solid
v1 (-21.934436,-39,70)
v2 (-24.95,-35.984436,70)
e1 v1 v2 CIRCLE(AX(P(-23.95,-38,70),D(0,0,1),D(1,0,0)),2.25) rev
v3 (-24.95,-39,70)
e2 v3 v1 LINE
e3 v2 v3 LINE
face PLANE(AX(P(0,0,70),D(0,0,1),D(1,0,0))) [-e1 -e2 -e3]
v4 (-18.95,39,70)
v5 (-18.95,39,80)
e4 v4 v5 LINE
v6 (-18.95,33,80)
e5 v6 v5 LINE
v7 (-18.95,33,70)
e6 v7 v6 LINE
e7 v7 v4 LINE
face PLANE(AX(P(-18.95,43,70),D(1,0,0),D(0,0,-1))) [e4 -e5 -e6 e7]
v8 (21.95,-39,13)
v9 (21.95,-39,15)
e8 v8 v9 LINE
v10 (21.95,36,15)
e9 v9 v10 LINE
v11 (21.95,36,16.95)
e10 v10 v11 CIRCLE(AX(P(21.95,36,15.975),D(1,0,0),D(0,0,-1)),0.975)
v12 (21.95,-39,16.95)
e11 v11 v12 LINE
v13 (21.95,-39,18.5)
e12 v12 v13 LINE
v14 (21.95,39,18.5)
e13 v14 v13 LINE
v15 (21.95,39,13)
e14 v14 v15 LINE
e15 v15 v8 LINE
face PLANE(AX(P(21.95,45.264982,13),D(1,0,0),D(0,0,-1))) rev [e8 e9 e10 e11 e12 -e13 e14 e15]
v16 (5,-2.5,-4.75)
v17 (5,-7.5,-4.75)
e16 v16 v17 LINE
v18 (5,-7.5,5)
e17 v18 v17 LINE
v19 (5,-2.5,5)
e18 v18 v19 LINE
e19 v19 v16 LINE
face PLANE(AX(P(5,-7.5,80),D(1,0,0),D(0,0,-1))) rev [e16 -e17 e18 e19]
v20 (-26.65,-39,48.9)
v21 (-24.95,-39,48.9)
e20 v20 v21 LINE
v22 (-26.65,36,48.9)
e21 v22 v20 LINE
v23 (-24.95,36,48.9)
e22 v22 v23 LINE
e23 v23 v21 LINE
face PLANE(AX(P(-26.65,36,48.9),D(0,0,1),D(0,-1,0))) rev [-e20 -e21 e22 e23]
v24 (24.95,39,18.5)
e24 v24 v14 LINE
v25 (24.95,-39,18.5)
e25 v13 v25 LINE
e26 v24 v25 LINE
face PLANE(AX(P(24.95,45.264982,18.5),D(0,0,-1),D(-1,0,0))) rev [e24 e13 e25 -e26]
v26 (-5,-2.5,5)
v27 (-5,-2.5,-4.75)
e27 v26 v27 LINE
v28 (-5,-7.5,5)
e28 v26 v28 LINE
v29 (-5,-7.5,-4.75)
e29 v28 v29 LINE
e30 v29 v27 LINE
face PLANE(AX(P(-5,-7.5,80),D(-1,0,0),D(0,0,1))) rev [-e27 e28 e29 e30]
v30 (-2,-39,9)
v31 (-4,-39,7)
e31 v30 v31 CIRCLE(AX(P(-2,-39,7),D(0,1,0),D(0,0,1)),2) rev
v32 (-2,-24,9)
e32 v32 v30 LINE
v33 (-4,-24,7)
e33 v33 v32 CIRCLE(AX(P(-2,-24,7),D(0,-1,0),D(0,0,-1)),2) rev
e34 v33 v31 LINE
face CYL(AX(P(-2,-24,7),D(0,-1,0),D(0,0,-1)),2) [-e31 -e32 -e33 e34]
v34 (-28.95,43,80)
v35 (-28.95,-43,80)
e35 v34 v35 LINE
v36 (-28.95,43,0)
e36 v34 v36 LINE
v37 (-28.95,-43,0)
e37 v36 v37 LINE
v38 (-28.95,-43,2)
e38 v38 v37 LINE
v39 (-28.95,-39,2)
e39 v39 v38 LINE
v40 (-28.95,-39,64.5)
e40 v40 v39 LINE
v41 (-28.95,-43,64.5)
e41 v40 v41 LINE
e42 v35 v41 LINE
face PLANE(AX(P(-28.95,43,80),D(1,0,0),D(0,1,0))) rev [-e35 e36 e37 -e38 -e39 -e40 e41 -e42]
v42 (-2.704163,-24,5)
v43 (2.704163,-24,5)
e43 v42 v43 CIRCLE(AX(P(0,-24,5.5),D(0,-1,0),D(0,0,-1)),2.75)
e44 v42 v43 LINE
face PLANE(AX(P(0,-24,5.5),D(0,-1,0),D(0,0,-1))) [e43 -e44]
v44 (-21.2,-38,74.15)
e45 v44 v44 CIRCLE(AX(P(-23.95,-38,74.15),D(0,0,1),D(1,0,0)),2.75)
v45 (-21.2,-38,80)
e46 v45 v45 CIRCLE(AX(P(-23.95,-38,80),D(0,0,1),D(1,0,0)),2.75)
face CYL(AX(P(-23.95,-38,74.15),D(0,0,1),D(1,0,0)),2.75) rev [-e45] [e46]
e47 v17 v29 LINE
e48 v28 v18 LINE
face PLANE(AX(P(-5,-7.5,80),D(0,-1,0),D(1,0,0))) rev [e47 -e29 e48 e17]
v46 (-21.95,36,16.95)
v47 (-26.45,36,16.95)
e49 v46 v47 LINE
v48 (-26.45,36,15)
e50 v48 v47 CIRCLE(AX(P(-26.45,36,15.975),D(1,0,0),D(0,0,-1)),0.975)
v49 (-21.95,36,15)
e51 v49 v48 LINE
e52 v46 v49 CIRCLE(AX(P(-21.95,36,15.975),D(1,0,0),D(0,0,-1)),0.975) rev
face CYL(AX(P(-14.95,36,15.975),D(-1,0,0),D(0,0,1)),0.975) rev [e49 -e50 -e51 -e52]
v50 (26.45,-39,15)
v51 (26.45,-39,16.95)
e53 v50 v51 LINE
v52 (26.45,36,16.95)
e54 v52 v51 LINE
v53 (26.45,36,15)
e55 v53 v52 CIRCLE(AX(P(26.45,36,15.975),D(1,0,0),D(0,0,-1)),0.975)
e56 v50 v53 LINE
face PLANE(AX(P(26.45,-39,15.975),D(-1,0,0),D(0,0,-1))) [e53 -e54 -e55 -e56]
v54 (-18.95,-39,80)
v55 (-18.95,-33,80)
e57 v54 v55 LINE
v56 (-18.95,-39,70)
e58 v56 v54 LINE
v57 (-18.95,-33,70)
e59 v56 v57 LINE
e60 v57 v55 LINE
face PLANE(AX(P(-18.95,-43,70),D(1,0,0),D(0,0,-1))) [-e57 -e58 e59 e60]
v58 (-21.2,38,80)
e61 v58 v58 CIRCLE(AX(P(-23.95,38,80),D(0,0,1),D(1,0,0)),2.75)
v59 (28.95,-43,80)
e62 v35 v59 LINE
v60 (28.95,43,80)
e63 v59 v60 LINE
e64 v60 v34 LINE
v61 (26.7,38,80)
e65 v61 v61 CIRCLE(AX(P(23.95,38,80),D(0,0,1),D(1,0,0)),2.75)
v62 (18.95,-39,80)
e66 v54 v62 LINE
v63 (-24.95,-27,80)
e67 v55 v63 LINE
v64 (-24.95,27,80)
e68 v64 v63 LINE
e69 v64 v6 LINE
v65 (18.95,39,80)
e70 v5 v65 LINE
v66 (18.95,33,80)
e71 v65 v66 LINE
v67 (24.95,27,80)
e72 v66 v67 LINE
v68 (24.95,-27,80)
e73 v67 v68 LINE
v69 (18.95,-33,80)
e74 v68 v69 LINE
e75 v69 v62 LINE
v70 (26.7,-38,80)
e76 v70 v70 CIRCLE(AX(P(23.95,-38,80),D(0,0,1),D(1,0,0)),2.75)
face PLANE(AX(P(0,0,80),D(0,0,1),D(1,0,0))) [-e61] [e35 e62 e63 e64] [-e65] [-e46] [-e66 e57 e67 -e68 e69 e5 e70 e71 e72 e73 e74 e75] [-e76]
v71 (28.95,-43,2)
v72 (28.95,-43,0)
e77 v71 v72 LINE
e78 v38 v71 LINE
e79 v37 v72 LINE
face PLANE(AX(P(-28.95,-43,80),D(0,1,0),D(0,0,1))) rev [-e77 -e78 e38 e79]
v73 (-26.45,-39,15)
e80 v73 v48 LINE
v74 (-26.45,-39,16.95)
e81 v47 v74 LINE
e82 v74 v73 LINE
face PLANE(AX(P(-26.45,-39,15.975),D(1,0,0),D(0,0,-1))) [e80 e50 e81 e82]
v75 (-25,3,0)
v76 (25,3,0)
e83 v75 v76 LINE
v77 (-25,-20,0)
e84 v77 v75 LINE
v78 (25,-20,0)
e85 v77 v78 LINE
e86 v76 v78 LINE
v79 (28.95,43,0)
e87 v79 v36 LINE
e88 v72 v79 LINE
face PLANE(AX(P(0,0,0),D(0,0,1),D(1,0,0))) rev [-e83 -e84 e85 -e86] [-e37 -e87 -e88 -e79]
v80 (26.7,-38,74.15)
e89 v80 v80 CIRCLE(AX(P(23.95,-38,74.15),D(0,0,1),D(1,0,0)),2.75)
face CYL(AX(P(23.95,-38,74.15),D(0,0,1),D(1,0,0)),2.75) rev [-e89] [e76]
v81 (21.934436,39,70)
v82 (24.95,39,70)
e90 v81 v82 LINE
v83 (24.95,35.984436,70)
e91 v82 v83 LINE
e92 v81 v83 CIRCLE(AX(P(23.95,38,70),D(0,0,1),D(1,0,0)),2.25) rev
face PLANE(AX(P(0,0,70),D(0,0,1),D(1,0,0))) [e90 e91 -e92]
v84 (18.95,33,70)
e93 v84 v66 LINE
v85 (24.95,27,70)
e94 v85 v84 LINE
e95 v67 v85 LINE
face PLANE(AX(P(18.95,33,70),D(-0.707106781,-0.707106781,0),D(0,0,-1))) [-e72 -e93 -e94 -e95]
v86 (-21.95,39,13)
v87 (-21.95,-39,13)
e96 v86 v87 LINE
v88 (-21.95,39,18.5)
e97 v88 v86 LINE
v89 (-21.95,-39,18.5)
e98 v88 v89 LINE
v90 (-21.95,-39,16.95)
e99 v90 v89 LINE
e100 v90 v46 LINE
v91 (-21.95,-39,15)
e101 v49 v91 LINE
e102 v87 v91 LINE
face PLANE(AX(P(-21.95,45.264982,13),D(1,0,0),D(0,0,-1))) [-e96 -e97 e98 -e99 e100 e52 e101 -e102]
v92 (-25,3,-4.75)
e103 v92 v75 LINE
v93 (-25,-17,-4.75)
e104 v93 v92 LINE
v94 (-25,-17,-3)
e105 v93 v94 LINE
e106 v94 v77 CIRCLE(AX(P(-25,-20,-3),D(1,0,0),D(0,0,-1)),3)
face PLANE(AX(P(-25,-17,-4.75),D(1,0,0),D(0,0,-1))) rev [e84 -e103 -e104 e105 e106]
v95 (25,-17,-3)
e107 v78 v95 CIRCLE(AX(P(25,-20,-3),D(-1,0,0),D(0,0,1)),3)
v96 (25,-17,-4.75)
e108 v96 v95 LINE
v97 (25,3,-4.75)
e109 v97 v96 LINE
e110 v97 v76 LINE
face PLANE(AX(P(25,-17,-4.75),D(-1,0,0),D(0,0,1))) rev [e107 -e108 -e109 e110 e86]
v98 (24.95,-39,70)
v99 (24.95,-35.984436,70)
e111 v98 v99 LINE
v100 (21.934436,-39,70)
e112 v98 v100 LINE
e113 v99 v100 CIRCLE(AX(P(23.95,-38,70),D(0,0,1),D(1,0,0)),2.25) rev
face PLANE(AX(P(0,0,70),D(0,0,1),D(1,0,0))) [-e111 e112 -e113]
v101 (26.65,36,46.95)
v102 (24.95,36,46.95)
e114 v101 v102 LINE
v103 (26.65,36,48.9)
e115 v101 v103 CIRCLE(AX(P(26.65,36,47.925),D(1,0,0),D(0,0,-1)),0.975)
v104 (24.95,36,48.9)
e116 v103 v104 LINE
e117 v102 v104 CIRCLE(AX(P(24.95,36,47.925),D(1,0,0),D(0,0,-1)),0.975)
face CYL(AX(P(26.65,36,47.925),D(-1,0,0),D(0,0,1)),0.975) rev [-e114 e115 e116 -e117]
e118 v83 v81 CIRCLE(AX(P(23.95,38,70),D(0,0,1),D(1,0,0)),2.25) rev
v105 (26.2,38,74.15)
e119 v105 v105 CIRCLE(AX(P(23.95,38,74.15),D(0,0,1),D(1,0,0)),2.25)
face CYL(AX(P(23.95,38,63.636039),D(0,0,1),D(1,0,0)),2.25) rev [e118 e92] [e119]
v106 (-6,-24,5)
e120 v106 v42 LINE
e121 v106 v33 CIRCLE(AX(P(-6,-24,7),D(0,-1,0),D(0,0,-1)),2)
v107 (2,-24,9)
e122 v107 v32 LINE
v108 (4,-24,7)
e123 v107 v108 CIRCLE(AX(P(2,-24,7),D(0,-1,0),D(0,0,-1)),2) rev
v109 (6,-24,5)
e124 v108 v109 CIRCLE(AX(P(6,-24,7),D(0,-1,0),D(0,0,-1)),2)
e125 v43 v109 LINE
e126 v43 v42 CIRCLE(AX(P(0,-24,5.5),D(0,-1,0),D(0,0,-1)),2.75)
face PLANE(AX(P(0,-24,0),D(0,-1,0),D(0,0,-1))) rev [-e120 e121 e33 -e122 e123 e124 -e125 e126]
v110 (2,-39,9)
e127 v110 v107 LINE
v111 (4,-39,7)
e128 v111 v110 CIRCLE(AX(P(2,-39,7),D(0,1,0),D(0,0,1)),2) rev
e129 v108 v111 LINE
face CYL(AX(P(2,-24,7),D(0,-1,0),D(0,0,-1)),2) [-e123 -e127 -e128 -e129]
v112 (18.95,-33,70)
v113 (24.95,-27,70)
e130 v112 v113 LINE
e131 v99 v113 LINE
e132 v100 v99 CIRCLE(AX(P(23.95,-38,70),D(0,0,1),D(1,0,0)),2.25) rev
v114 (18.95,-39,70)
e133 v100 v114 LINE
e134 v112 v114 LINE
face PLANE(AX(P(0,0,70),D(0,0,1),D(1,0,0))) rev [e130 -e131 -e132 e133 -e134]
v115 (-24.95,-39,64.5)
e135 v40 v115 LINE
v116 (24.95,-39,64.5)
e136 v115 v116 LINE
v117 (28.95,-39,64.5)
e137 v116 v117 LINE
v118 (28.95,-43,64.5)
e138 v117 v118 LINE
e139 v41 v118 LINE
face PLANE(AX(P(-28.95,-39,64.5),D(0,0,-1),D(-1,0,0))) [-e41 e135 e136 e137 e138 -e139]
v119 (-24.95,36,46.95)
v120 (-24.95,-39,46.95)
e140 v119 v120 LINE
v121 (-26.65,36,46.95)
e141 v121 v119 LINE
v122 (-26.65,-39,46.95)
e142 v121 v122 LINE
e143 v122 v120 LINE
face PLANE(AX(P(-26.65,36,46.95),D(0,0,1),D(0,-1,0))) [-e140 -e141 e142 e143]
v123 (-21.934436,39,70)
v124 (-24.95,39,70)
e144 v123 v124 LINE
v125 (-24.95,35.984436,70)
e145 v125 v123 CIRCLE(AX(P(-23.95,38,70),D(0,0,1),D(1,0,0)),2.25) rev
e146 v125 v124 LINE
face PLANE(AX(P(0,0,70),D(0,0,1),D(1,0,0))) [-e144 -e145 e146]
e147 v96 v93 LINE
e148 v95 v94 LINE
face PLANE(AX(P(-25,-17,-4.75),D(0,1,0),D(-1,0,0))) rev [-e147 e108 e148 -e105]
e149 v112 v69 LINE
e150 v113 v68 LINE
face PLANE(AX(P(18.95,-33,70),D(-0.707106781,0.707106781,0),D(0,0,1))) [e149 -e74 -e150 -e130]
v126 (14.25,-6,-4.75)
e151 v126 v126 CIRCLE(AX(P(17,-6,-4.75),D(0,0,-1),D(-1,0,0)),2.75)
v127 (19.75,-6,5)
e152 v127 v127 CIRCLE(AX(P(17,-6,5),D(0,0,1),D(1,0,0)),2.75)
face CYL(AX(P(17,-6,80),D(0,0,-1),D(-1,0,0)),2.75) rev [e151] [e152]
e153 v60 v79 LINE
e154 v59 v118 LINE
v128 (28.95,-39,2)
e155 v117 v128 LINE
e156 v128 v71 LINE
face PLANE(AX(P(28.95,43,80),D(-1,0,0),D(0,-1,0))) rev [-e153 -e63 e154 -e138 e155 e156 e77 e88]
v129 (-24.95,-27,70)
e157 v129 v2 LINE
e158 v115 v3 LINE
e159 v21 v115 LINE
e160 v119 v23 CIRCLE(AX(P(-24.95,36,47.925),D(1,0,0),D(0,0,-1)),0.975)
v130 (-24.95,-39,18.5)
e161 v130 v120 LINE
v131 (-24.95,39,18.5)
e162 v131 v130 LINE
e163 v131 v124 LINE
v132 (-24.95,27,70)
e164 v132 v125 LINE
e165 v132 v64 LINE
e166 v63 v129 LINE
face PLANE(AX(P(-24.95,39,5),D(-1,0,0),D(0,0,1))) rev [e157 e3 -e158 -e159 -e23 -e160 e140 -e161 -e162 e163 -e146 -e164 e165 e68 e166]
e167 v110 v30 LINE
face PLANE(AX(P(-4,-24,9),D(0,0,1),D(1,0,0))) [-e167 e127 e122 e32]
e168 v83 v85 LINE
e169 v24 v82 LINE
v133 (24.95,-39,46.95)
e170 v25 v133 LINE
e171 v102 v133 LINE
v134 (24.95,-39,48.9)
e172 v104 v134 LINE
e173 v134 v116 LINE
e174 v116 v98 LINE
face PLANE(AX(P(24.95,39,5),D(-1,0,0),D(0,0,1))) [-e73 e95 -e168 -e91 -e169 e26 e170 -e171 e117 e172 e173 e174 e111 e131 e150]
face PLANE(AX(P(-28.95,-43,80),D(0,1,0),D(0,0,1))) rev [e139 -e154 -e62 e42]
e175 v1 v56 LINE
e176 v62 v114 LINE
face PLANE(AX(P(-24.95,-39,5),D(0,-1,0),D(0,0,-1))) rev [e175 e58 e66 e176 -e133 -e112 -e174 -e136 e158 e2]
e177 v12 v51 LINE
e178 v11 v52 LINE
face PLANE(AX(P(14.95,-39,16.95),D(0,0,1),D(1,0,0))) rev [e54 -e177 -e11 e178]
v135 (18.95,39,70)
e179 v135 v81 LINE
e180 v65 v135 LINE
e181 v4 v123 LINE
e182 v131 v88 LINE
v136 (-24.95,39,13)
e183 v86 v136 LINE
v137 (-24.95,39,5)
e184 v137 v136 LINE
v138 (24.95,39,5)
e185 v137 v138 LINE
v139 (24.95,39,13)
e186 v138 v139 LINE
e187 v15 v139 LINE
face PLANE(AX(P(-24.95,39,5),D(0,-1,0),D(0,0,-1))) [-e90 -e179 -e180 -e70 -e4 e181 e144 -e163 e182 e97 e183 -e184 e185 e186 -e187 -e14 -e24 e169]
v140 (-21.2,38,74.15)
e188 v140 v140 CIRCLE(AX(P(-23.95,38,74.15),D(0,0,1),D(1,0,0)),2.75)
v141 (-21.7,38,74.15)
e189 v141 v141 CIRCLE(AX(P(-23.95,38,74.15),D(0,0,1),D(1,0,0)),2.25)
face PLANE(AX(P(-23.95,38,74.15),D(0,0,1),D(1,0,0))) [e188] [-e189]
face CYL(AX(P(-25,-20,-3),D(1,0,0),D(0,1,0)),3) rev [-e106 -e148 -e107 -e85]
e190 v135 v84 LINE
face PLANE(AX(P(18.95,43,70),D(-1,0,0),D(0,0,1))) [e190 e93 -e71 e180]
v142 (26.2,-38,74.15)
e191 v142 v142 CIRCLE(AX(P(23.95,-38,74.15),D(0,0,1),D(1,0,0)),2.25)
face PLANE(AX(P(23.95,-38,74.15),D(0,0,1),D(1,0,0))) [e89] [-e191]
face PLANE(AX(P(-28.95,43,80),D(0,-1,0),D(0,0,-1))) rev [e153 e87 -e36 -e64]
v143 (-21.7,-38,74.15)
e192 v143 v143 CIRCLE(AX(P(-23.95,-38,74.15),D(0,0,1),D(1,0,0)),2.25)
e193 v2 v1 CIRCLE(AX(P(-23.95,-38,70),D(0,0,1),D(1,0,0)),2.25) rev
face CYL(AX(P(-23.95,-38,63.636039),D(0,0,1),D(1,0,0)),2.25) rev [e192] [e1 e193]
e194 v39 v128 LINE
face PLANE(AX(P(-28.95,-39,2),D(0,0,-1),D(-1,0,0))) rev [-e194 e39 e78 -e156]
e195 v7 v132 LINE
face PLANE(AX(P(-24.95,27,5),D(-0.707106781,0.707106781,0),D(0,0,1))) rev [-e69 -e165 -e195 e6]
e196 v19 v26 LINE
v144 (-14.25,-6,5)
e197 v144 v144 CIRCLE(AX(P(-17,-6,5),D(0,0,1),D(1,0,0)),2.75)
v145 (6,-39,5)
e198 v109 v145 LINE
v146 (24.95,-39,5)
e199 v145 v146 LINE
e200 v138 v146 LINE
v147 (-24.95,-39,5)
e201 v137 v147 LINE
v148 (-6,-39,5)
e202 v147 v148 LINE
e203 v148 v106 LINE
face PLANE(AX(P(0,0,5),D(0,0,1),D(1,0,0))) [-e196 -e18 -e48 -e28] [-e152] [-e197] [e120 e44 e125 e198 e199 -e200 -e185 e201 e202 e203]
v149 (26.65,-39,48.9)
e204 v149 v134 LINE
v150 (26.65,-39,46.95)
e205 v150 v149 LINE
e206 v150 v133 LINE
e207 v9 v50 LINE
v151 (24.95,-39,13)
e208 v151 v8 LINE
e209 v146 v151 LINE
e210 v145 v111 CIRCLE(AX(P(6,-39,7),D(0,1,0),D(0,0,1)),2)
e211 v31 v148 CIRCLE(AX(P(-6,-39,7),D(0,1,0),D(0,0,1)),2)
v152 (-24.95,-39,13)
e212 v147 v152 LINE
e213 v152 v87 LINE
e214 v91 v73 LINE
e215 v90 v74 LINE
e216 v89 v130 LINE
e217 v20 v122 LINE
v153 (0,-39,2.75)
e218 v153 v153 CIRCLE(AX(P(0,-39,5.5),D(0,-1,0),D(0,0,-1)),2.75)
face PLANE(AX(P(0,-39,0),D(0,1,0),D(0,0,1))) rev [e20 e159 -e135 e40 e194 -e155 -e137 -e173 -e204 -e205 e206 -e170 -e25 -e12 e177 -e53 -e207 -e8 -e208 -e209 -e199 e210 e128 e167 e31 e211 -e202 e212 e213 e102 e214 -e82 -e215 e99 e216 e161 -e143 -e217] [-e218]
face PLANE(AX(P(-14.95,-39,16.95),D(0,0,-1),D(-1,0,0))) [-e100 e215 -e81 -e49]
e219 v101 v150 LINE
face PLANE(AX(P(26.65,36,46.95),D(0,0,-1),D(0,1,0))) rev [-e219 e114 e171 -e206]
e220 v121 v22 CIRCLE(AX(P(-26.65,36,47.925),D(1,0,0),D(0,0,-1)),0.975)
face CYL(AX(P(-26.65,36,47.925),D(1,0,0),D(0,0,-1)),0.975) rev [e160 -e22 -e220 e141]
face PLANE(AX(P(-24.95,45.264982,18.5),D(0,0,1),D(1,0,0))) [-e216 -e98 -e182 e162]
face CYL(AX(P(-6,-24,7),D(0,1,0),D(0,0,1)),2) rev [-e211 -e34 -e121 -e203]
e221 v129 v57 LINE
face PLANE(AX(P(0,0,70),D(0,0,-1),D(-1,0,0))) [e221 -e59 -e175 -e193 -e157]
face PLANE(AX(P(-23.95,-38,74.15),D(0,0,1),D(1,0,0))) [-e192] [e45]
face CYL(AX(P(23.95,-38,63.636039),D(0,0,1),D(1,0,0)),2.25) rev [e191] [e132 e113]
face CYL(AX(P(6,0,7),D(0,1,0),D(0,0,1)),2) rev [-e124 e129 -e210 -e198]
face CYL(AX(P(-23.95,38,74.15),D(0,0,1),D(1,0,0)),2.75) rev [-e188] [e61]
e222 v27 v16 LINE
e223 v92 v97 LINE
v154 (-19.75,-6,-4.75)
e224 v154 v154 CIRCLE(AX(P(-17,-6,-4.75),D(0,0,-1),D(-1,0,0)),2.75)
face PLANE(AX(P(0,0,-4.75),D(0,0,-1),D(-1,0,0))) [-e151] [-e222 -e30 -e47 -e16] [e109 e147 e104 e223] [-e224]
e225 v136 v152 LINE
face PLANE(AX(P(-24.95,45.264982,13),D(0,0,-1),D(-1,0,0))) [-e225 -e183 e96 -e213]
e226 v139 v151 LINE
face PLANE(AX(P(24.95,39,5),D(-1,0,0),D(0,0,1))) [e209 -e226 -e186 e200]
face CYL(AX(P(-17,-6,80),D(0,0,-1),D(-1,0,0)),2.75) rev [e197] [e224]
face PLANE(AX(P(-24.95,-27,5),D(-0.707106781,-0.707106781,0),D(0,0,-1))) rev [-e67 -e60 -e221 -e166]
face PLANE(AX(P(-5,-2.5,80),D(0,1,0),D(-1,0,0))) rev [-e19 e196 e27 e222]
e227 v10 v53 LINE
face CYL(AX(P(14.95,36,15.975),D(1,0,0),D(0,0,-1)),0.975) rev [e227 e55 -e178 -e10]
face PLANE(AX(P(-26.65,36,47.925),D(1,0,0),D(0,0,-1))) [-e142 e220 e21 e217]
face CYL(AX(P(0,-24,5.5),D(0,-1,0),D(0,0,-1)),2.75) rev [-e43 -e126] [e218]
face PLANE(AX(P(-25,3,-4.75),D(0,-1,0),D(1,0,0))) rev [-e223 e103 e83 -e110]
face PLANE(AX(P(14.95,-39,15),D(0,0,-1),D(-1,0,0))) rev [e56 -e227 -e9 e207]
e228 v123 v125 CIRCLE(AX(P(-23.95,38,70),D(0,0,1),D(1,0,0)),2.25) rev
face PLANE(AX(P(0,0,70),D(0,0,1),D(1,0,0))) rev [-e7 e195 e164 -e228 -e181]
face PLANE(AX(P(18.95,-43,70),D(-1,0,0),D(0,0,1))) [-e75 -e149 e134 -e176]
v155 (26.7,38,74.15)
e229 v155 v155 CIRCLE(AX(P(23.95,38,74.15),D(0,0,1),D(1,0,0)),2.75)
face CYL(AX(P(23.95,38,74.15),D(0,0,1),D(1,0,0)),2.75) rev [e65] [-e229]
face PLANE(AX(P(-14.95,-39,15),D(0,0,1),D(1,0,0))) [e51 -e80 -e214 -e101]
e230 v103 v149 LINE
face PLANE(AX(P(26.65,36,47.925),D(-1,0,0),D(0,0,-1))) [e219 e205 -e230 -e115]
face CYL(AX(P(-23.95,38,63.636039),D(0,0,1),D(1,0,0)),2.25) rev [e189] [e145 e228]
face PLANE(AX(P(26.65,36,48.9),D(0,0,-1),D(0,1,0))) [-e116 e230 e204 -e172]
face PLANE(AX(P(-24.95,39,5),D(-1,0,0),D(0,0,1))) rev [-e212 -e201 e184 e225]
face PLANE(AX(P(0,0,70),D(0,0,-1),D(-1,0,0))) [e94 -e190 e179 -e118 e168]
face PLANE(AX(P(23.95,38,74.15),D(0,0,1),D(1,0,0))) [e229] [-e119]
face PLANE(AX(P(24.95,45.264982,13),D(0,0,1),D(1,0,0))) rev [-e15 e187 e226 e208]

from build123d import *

# Parameters (mm, degrees)
ESQUISSE1_W              = 57.9
ESQUISSE1_H              = 86
BOSS_EXTRU_1_DEPTH       = 80
ESQUISSE2_W              = 49.9
ESQUISSE2_H              = 78
ENL_V_MAT_EXTRU_1_DEPTH  = 75
ESQUISSE3_W              = 10
ESQUISSE3_H              = 10
BOSS_EXTRU_2_DEPTH       = 10
ESQUISSE4_R              = 2.75
ENL_V_MAT_EXTRU_2_DEPTH  = 5.85
ESQUISSE47_R             = 2.25
ENL_V_MAT_EXTRU_25_DEPTH = 10
ESQUISSE19_W             = 50
ESQUISSE19_H             = 20
BOSS_EXTRU_9_DEPTH       = 4.75
CONG_1_R                 = 3
ESQUISSE29_W             = 10
ESQUISSE29_H             = 5
ENL_V_MAT_EXTRU_11_DEPTH = 100.346187647
ESQUISSE32_W             = 57.9
ESQUISSE32_H             = 62.5
ENL_V_MAT_EXTRU_16_DEPTH = 4
ESQUISSE46_W             = 3
ESQUISSE46_H             = 5.5
BOSS_EXTRU_10_DEPTH      = 78
ENL_V_START              = -1.5
ENL_V_MAT_EXTRU_20_DEPTH = 11.5
ENL_V_MAT_EXTRU_21_DEPTH = 1.7
CHANFREIN1_SIZE          = 6
ESQUISSE45_R             = 2.75
ENL_V_MAT_EXTRU_24_DEPTH = 100.346187647
ESQUISSE48_W             = 8
ESQUISSE48_H             = 4
BOSS_EXTRU_11_DEPTH      = 15
ESQUISSE49_R             = 2.75
ENL_V_MAT_EXTRU_26_DEPTH = 15
CONG_2_R                 = 2


with BuildPart() as part:
    # Esquisse1 → Boss.-Extru.1 (new body)
    with BuildSketch(Plane.XY):
        Rectangle(ESQUISSE1_W, ESQUISSE1_H)
    extrude(amount=BOSS_EXTRU_1_DEPTH)

    # Esquisse2 → Enlèv. mat.-Extru.1 (cut)
    with BuildSketch(Plane.XY.offset(80)):
        Rectangle(ESQUISSE2_W, ESQUISSE2_H)
    extrude(amount=-ENL_V_MAT_EXTRU_1_DEPTH, mode=Mode.SUBTRACT)

    # Esquisse3 → Boss.-Extru.2 (add)
    with BuildSketch(Plane.XY.offset(80)):
        with Locations((-23.95, 38)):
            Rectangle(ESQUISSE3_W, ESQUISSE3_H)
        with Locations((-23.95, -38)):
            Rectangle(ESQUISSE3_W, ESQUISSE3_H)
        with Locations((23.95, -38)):
            Rectangle(ESQUISSE3_W, ESQUISSE3_H)
        with Locations((23.95, 38)):
            Rectangle(ESQUISSE3_W, ESQUISSE3_H)
    extrude(amount=-BOSS_EXTRU_2_DEPTH)

    # Esquisse4 → Enlèv. mat.-Extru.2 (cut)
    with BuildSketch(Plane.XY.offset(80)):
        with Locations((23.95, -38)):
            Circle(ESQUISSE4_R)
        with Locations((-23.95, -38)):
            Circle(ESQUISSE4_R)
        with Locations((-23.95, 38)):
            Circle(ESQUISSE4_R)
        with Locations((23.95, 38)):
            Circle(ESQUISSE4_R)
    extrude(amount=-ENL_V_MAT_EXTRU_2_DEPTH, mode=Mode.SUBTRACT)

    # Esquisse47 → Enlèv. mat.-Extru.25 (cut)
    with BuildSketch(Plane.XY.offset(80)):
        with Locations((23.95, -38)):
            Circle(ESQUISSE47_R)
        with Locations((-23.95, -38)):
            Circle(ESQUISSE47_R)
        with Locations((-23.95, 38)):
            Circle(ESQUISSE47_R)
        with Locations((23.95, 38)):
            Circle(ESQUISSE47_R)
    extrude(amount=-ENL_V_MAT_EXTRU_25_DEPTH, mode=Mode.SUBTRACT)

    # Esquisse19 → Boss.-Extru.9 (add)
    with BuildSketch(Plane(origin=(0, 0, 0), x_dir=(-1, 0, 0), z_dir=(0, 0, -1))):
        with Locations((0, -7)):
            Rectangle(ESQUISSE19_W, ESQUISSE19_H)
    extrude(amount=BOSS_EXTRU_9_DEPTH)

    # Congé1
    cong_1_edges = [part.edges().sort_by_distance(p)[0] for p in [
        (0, -17, 0),
    ]]
    fillet(cong_1_edges, radius=CONG_1_R)

    # Esquisse29 → Enlèv. mat.-Extru.11 (cut, through all)
    with BuildSketch(Plane(origin=(0, 0, -4.75), x_dir=(-1, 0, 0), z_dir=(0, 0, -1))):
        with Locations((0, -5)):
            Rectangle(ESQUISSE29_W, ESQUISSE29_H)
    extrude(amount=-ENL_V_MAT_EXTRU_11_DEPTH, mode=Mode.SUBTRACT)

    # Esquisse32 → Enlèv. mat.-Extru.16 (cut)
    with BuildSketch(Plane.XZ.offset(43)):
        with Locations((0, 33.25)):
            Rectangle(ESQUISSE32_W, ESQUISSE32_H)
    extrude(amount=-ENL_V_MAT_EXTRU_16_DEPTH, mode=Mode.SUBTRACT)

    # Esquisse46 → Boss.-Extru.10 (add)
    with BuildSketch(Plane.XZ.offset(39)):
        with Locations((-23.45, 15.75)):
            Rectangle(ESQUISSE46_W, ESQUISSE46_H)
    boss_extru_10 = extrude(amount=-BOSS_EXTRU_10_DEPTH)

    # Esquisse38 → Enlèv. mat.-Extru.20 (cut)
    with BuildSketch(Plane(origin=(-24.95, 0, 0), x_dir=(0, 0, -1), z_dir=(1, 0, 0)).offset(ENL_V_START)):
        with BuildLine():
            Line((-16.95, -39), (-16.95, 36))
            ThreePointArc((-16.95, 36), (-15.975, 36.975), (-15, 36))
            Line((-15, 36), (-15, -39))
            ThreePointArc((-15, -39), (-15.975, -39.975), (-16.95, -39))
        make_face()
    enl_v_mat_extru_20 = extrude(amount=ENL_V_MAT_EXTRU_20_DEPTH, mode=Mode.SUBTRACT)

    # Esquisse40 → Enlèv. mat.-Extru.21 (cut)
    with BuildSketch(Plane(origin=(-24.95, 0, 0), x_dir=(0, 0, -1), z_dir=(1, 0, 0))):
        with BuildLine():
            Line((-46.95, 36), (-46.95, -39))
            ThreePointArc((-46.95, -39), (-47.925, -39.975), (-48.9, -39))
            Line((-48.9, -39), (-48.9, 36))
            ThreePointArc((-48.9, 36), (-47.925, 36.975), (-46.95, 36))
        make_face()
    enl_v_mat_extru_21 = extrude(amount=-ENL_V_MAT_EXTRU_21_DEPTH, mode=Mode.SUBTRACT)

    # Chanfrein1
    chanfrein1_edges = [part.edges().sort_by_distance(p)[0] for p in [
        (24.95, -33, 75),
        (-24.95, -33, 75),
        (24.95, 33, 75),
        (-24.95, 33, 75),
    ]]
    chamfer(chanfrein1_edges, length=CHANFREIN1_SIZE - 0.0001)  # a hair under: the kernel refuses the full size

    # Symétrie1: Boss.-Extru.10, Enlèv. mat.-Extru.20, Enlèv. mat.-Extru.21 across plane
    add(boss_extru_10.mirror(Plane(origin=(0, 0, 0), x_dir=(0, 0, 1), z_dir=(1, 0, 0))))
    add(enl_v_mat_extru_20.mirror(Plane(origin=(0, 0, 0), x_dir=(0, 0, 1), z_dir=(1, 0, 0))), mode=Mode.SUBTRACT)
    add(enl_v_mat_extru_21.mirror(Plane(origin=(0, 0, 0), x_dir=(0, 0, 1), z_dir=(1, 0, 0))), mode=Mode.SUBTRACT)

    # Esquisse45 → Enlèv. mat.-Extru.24 (cut, through all)
    with BuildSketch(Plane(origin=(0, 0, -4.75), x_dir=(-1, 0, 0), z_dir=(0, 0, -1))):
        with Locations((17, -6)):
            Circle(ESQUISSE45_R)
        with Locations((-17, -6)):
            Circle(ESQUISSE45_R)
    extrude(amount=-ENL_V_MAT_EXTRU_24_DEPTH, mode=Mode.SUBTRACT)

    # Esquisse48 → Boss.-Extru.11 (add)
    with BuildSketch(Plane.XZ.offset(39)):
        with Locations((0, 7)):
            Rectangle(ESQUISSE48_W, ESQUISSE48_H)
    extrude(amount=-BOSS_EXTRU_11_DEPTH)

    # Esquisse49 → Enlèv. mat.-Extru.26 (cut)
    with BuildSketch(Plane.XZ.offset(39)):
        with Locations(Location((0, 5.5, 0), (0, 0, 270))):
            Circle(ESQUISSE49_R)
    extrude(amount=-ENL_V_MAT_EXTRU_26_DEPTH, mode=Mode.SUBTRACT)

    # Congé2
    cong_2_edges = [part.edges().sort_by_distance(p)[0] for p in [
        (4, -31.5, 5),
        (-4, -31.5, 5),
    ]]
    fillet(cong_2_edges, radius=CONG_2_R)
    cong_2_2_edges = [part.edges().sort_by_distance(p)[0] for p in [
        (4, -31.5, 9),
        (-4, -31.5, 9),
    ]]
    fillet(cong_2_2_edges, radius=CONG_2_R - 0.0001)  # a hair under: the kernel refuses the full size


solid = part.part
